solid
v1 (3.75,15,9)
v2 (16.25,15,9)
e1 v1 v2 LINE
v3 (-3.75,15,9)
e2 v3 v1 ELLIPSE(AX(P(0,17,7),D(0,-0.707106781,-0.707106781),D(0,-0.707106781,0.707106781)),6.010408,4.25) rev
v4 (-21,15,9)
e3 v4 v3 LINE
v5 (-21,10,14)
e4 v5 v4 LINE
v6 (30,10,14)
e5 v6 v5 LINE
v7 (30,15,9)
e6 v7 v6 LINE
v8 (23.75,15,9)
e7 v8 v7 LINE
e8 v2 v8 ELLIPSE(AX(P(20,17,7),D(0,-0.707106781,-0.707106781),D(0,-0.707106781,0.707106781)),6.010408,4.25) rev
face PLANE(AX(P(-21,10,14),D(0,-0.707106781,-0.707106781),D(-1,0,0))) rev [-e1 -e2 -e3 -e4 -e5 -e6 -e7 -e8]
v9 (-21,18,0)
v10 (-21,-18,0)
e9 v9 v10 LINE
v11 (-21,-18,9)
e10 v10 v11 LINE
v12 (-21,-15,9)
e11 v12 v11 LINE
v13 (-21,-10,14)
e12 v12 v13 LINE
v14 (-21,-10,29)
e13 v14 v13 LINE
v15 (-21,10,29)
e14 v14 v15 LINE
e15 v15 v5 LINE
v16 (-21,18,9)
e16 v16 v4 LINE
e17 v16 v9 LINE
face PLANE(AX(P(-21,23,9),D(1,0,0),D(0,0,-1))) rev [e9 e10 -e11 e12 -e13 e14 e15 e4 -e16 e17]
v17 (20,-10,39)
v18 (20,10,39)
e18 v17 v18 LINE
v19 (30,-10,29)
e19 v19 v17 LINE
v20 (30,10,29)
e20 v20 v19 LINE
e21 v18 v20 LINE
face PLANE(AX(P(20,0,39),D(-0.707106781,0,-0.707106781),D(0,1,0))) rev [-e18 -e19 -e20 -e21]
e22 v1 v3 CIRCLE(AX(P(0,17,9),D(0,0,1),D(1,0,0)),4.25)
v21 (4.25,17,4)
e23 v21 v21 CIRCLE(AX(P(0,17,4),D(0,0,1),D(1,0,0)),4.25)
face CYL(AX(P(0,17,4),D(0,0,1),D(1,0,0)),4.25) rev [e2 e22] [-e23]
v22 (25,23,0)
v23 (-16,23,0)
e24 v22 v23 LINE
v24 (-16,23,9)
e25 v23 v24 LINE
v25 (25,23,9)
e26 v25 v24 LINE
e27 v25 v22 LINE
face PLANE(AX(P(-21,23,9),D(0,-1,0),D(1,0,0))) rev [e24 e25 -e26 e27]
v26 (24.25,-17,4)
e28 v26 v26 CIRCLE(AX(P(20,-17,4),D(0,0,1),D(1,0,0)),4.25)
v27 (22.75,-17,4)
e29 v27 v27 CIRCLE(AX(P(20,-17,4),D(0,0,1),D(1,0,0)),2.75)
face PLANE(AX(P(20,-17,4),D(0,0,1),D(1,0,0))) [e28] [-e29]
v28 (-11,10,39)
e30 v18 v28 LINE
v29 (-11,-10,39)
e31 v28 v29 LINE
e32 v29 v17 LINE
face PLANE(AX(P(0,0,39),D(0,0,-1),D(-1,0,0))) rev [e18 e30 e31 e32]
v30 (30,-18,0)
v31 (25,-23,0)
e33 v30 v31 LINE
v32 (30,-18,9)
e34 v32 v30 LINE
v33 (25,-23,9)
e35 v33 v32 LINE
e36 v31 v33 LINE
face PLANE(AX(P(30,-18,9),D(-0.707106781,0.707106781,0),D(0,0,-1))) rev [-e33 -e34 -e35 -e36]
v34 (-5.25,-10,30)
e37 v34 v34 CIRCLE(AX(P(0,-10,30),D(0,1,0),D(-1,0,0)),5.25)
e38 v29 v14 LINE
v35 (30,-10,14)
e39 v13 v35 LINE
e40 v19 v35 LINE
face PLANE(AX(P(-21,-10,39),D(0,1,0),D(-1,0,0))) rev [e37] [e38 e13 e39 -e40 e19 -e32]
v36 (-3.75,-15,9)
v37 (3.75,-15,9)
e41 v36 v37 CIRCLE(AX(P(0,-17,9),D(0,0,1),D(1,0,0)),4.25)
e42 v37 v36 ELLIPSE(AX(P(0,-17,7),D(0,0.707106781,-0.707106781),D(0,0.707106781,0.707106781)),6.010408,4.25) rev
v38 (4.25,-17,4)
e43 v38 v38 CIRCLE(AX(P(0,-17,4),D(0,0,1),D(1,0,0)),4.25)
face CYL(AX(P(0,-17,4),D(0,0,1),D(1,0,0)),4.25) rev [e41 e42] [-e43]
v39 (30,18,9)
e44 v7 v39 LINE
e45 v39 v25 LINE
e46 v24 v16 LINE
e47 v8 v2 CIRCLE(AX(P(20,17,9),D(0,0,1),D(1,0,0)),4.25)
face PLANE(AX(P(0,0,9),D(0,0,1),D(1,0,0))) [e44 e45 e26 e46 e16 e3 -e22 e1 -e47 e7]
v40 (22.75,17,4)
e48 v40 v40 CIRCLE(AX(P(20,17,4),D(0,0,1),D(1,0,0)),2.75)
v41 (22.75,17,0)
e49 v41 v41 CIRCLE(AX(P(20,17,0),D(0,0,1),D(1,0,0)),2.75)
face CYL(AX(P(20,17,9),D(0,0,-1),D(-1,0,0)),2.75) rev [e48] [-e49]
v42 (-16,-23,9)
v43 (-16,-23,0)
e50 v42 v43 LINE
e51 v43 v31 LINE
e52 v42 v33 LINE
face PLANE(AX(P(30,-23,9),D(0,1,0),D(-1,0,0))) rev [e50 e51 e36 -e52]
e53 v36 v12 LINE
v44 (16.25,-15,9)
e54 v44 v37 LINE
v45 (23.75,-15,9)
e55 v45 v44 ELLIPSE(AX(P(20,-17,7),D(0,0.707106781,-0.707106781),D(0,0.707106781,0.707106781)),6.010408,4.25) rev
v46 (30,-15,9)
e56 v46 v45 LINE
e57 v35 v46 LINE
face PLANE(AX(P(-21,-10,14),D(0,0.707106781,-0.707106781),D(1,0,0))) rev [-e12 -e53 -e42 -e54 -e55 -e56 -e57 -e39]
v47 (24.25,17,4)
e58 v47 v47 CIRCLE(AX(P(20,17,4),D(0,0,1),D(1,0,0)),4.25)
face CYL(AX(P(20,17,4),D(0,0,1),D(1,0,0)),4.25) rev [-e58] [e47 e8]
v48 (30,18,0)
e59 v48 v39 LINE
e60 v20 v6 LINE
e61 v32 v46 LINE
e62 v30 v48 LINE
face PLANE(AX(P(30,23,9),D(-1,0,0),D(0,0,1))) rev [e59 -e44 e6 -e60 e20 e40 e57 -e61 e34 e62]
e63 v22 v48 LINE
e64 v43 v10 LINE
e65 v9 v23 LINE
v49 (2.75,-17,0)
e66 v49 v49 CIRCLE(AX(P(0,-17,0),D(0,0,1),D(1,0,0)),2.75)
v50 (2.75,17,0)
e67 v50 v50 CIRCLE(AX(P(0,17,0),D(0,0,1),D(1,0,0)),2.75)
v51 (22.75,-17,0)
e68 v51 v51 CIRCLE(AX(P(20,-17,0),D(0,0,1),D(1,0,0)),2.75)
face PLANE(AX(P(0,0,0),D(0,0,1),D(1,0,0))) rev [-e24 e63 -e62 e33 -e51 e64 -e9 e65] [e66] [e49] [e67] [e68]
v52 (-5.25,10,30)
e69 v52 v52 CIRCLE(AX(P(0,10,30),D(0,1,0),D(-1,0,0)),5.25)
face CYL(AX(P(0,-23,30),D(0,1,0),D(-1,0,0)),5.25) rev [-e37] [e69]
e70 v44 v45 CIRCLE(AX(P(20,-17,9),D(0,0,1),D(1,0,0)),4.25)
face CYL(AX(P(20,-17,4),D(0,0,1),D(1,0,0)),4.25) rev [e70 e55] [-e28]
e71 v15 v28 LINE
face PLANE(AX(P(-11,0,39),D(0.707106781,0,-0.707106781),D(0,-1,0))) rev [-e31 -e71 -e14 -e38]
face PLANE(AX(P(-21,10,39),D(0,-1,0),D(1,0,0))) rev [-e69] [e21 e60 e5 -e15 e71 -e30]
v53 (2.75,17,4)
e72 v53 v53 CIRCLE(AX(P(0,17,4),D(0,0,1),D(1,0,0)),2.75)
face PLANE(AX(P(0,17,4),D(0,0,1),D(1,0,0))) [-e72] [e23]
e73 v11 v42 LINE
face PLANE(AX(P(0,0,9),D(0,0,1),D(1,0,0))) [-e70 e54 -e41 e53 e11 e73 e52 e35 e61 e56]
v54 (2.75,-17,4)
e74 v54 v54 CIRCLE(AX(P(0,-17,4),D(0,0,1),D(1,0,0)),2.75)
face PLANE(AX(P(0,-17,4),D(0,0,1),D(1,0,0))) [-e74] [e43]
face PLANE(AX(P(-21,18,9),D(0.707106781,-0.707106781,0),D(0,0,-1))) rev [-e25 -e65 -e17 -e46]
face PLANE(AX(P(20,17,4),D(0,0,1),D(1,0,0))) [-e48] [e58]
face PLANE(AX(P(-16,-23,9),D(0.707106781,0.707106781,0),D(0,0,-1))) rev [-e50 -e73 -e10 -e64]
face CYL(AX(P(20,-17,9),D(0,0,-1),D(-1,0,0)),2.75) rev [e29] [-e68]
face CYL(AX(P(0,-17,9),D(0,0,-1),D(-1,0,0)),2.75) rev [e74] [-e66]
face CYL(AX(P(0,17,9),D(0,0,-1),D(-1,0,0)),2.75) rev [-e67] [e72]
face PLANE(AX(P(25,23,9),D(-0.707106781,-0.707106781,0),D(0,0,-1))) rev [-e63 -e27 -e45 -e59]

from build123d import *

# Parameters (mm, degrees)
SKETCH_1_R          = 2.75
EXTRUDE_1_DEPTH     = 9
SKETCH_6_R          = 4.25
CUT_EXTRUDE_3_DEPTH = 5
CHAMFER_2_SIZE      = 5
SKETCH_8_W          = 51
SKETCH_8_H          = 20
EXTRUDE_2_DEPTH     = 30
SKETCH_9_R          = 5.25
CUT_EXTRUDE_4_DEPTH = 60.245252974
CHAMFER_3_SIZE      = 10
CHAMFER_4_SIZE      = 5


with BuildPart() as part:
    # 草圖1 → 填料-伸長1 (new body)
    with BuildSketch(Plane.XY):
        Polygon((30, 23), (21, 23), (-21, 23), (-21, -23), (21, -23), (30, -23), align=None)
        with Locations((0, 17)):
            Circle(SKETCH_1_R, mode=Mode.SUBTRACT)
        with Locations((20, 17)):
            Circle(SKETCH_1_R, mode=Mode.SUBTRACT)
        with Locations((20, -17)):
            Circle(SKETCH_1_R, mode=Mode.SUBTRACT)
        with Locations((0, -17)):
            Circle(SKETCH_1_R, mode=Mode.SUBTRACT)
    extrude(amount=EXTRUDE_1_DEPTH)

    # 草圖6 → 除料-伸長3 (cut)
    with BuildSketch(Plane.XY.offset(9)):
        with Locations((0, 17)):
            Circle(SKETCH_6_R)
        with Locations((20, 17)):
            Circle(SKETCH_6_R)
        with Locations((20, -17)):
            Circle(SKETCH_6_R)
        with Locations((0, -17)):
            Circle(SKETCH_6_R)
    extrude(amount=-CUT_EXTRUDE_3_DEPTH, mode=Mode.SUBTRACT)

    # 導角2
    chamfer_2_edges = [part.edges().sort_by_distance(p)[0] for p in [
        (-21, 23, 4.5),
        (30, 23, 4.5),
        (30, -23, 4.5),
        (-21, -23, 4.5),
    ]]
    chamfer(chamfer_2_edges, length=CHAMFER_2_SIZE)

    # 草圖8 → 填料-伸長2 (add)
    with BuildSketch(Plane.XY.offset(9)):
        with Locations((4.5, 0)):
            Rectangle(SKETCH_8_W, SKETCH_8_H)
    extrude(amount=EXTRUDE_2_DEPTH)

    # 草圖9 → 除料-伸長4 (cut, through all)
    with BuildSketch(Plane(origin=(0, 10, 0), x_dir=(1, 0, 0), z_dir=(0, 1, 0))):
        with Locations(Location((0, -30, 0), (0, 0, 180))):
            Circle(SKETCH_9_R)
    extrude(amount=-CUT_EXTRUDE_4_DEPTH, mode=Mode.SUBTRACT)

    # 導角3
    chamfer_3_edges = [part.edges().sort_by_distance(p)[0] for p in [
        (-21, 0, 39),
        (30, 0, 39),
    ]]
    chamfer(chamfer_3_edges, length=CHAMFER_3_SIZE)

    # 導角4
    # the kernel refuses this chamfer: 5 mm, written as the material it adds along each edge
    with BuildSketch(Plane(origin=(-21, -10, 9), x_dir=(0, 0.027495876610586317, 0.9996219169112968), z_dir=(1, 0, 0))) as chamfer_4_piece_1_section:
        Polygon((CHAMFER_4_SIZE * 0.999621916911, CHAMFER_4_SIZE * 0.0274958766106), (-CHAMFER_4_SIZE * 0.0274958766106, CHAMFER_4_SIZE * 0.999621916911), (0, 0), align=None)
    chamfer_4_piece_1 = extrude(amount=51, mode=Mode.PRIVATE)
    chamfer_4_piece_1 = chamfer_4_piece_1 - Plane(origin=(0, -17, 10.693214972), x_dir=(1, 0, 0), z_dir=(0, 0, 1)) * Cylinder(4.25, 122, mode=Mode.PRIVATE)
    chamfer_4_piece_1 = chamfer_4_piece_1 - Plane(origin=(20, -17, 10.693214972), x_dir=(1, 0, 0), z_dir=(0, 0, 1)) * Cylinder(4.25, 122, mode=Mode.PRIVATE)
    add(chamfer_4_piece_1)
    with BuildSketch(Plane(origin=(30, 10, 9), x_dir=(0, -0.027495876610586317, 0.9996219169112968), z_dir=(-1, 0, 0))) as chamfer_4_piece_2_section:
        Polygon((CHAMFER_4_SIZE * 0.999621916911, CHAMFER_4_SIZE * 0.0274958766106), (-CHAMFER_4_SIZE * 0.0274958766106, CHAMFER_4_SIZE * 0.999621916911), (0, 0), align=None)
    chamfer_4_piece_2 = extrude(amount=51, mode=Mode.PRIVATE)
    chamfer_4_piece_2 = chamfer_4_piece_2 - Plane(origin=(0, 17, 10.693214972), x_dir=(1, 0, 0), z_dir=(0, 0, 1)) * Cylinder(4.25, 122, mode=Mode.PRIVATE)
    chamfer_4_piece_2 = chamfer_4_piece_2 - Plane(origin=(20, 17, 10.693214972), x_dir=(1, 0, 0), z_dir=(0, 0, 1)) * Cylinder(4.25, 122, mode=Mode.PRIVATE)
    add(chamfer_4_piece_2)


solid = part.part
